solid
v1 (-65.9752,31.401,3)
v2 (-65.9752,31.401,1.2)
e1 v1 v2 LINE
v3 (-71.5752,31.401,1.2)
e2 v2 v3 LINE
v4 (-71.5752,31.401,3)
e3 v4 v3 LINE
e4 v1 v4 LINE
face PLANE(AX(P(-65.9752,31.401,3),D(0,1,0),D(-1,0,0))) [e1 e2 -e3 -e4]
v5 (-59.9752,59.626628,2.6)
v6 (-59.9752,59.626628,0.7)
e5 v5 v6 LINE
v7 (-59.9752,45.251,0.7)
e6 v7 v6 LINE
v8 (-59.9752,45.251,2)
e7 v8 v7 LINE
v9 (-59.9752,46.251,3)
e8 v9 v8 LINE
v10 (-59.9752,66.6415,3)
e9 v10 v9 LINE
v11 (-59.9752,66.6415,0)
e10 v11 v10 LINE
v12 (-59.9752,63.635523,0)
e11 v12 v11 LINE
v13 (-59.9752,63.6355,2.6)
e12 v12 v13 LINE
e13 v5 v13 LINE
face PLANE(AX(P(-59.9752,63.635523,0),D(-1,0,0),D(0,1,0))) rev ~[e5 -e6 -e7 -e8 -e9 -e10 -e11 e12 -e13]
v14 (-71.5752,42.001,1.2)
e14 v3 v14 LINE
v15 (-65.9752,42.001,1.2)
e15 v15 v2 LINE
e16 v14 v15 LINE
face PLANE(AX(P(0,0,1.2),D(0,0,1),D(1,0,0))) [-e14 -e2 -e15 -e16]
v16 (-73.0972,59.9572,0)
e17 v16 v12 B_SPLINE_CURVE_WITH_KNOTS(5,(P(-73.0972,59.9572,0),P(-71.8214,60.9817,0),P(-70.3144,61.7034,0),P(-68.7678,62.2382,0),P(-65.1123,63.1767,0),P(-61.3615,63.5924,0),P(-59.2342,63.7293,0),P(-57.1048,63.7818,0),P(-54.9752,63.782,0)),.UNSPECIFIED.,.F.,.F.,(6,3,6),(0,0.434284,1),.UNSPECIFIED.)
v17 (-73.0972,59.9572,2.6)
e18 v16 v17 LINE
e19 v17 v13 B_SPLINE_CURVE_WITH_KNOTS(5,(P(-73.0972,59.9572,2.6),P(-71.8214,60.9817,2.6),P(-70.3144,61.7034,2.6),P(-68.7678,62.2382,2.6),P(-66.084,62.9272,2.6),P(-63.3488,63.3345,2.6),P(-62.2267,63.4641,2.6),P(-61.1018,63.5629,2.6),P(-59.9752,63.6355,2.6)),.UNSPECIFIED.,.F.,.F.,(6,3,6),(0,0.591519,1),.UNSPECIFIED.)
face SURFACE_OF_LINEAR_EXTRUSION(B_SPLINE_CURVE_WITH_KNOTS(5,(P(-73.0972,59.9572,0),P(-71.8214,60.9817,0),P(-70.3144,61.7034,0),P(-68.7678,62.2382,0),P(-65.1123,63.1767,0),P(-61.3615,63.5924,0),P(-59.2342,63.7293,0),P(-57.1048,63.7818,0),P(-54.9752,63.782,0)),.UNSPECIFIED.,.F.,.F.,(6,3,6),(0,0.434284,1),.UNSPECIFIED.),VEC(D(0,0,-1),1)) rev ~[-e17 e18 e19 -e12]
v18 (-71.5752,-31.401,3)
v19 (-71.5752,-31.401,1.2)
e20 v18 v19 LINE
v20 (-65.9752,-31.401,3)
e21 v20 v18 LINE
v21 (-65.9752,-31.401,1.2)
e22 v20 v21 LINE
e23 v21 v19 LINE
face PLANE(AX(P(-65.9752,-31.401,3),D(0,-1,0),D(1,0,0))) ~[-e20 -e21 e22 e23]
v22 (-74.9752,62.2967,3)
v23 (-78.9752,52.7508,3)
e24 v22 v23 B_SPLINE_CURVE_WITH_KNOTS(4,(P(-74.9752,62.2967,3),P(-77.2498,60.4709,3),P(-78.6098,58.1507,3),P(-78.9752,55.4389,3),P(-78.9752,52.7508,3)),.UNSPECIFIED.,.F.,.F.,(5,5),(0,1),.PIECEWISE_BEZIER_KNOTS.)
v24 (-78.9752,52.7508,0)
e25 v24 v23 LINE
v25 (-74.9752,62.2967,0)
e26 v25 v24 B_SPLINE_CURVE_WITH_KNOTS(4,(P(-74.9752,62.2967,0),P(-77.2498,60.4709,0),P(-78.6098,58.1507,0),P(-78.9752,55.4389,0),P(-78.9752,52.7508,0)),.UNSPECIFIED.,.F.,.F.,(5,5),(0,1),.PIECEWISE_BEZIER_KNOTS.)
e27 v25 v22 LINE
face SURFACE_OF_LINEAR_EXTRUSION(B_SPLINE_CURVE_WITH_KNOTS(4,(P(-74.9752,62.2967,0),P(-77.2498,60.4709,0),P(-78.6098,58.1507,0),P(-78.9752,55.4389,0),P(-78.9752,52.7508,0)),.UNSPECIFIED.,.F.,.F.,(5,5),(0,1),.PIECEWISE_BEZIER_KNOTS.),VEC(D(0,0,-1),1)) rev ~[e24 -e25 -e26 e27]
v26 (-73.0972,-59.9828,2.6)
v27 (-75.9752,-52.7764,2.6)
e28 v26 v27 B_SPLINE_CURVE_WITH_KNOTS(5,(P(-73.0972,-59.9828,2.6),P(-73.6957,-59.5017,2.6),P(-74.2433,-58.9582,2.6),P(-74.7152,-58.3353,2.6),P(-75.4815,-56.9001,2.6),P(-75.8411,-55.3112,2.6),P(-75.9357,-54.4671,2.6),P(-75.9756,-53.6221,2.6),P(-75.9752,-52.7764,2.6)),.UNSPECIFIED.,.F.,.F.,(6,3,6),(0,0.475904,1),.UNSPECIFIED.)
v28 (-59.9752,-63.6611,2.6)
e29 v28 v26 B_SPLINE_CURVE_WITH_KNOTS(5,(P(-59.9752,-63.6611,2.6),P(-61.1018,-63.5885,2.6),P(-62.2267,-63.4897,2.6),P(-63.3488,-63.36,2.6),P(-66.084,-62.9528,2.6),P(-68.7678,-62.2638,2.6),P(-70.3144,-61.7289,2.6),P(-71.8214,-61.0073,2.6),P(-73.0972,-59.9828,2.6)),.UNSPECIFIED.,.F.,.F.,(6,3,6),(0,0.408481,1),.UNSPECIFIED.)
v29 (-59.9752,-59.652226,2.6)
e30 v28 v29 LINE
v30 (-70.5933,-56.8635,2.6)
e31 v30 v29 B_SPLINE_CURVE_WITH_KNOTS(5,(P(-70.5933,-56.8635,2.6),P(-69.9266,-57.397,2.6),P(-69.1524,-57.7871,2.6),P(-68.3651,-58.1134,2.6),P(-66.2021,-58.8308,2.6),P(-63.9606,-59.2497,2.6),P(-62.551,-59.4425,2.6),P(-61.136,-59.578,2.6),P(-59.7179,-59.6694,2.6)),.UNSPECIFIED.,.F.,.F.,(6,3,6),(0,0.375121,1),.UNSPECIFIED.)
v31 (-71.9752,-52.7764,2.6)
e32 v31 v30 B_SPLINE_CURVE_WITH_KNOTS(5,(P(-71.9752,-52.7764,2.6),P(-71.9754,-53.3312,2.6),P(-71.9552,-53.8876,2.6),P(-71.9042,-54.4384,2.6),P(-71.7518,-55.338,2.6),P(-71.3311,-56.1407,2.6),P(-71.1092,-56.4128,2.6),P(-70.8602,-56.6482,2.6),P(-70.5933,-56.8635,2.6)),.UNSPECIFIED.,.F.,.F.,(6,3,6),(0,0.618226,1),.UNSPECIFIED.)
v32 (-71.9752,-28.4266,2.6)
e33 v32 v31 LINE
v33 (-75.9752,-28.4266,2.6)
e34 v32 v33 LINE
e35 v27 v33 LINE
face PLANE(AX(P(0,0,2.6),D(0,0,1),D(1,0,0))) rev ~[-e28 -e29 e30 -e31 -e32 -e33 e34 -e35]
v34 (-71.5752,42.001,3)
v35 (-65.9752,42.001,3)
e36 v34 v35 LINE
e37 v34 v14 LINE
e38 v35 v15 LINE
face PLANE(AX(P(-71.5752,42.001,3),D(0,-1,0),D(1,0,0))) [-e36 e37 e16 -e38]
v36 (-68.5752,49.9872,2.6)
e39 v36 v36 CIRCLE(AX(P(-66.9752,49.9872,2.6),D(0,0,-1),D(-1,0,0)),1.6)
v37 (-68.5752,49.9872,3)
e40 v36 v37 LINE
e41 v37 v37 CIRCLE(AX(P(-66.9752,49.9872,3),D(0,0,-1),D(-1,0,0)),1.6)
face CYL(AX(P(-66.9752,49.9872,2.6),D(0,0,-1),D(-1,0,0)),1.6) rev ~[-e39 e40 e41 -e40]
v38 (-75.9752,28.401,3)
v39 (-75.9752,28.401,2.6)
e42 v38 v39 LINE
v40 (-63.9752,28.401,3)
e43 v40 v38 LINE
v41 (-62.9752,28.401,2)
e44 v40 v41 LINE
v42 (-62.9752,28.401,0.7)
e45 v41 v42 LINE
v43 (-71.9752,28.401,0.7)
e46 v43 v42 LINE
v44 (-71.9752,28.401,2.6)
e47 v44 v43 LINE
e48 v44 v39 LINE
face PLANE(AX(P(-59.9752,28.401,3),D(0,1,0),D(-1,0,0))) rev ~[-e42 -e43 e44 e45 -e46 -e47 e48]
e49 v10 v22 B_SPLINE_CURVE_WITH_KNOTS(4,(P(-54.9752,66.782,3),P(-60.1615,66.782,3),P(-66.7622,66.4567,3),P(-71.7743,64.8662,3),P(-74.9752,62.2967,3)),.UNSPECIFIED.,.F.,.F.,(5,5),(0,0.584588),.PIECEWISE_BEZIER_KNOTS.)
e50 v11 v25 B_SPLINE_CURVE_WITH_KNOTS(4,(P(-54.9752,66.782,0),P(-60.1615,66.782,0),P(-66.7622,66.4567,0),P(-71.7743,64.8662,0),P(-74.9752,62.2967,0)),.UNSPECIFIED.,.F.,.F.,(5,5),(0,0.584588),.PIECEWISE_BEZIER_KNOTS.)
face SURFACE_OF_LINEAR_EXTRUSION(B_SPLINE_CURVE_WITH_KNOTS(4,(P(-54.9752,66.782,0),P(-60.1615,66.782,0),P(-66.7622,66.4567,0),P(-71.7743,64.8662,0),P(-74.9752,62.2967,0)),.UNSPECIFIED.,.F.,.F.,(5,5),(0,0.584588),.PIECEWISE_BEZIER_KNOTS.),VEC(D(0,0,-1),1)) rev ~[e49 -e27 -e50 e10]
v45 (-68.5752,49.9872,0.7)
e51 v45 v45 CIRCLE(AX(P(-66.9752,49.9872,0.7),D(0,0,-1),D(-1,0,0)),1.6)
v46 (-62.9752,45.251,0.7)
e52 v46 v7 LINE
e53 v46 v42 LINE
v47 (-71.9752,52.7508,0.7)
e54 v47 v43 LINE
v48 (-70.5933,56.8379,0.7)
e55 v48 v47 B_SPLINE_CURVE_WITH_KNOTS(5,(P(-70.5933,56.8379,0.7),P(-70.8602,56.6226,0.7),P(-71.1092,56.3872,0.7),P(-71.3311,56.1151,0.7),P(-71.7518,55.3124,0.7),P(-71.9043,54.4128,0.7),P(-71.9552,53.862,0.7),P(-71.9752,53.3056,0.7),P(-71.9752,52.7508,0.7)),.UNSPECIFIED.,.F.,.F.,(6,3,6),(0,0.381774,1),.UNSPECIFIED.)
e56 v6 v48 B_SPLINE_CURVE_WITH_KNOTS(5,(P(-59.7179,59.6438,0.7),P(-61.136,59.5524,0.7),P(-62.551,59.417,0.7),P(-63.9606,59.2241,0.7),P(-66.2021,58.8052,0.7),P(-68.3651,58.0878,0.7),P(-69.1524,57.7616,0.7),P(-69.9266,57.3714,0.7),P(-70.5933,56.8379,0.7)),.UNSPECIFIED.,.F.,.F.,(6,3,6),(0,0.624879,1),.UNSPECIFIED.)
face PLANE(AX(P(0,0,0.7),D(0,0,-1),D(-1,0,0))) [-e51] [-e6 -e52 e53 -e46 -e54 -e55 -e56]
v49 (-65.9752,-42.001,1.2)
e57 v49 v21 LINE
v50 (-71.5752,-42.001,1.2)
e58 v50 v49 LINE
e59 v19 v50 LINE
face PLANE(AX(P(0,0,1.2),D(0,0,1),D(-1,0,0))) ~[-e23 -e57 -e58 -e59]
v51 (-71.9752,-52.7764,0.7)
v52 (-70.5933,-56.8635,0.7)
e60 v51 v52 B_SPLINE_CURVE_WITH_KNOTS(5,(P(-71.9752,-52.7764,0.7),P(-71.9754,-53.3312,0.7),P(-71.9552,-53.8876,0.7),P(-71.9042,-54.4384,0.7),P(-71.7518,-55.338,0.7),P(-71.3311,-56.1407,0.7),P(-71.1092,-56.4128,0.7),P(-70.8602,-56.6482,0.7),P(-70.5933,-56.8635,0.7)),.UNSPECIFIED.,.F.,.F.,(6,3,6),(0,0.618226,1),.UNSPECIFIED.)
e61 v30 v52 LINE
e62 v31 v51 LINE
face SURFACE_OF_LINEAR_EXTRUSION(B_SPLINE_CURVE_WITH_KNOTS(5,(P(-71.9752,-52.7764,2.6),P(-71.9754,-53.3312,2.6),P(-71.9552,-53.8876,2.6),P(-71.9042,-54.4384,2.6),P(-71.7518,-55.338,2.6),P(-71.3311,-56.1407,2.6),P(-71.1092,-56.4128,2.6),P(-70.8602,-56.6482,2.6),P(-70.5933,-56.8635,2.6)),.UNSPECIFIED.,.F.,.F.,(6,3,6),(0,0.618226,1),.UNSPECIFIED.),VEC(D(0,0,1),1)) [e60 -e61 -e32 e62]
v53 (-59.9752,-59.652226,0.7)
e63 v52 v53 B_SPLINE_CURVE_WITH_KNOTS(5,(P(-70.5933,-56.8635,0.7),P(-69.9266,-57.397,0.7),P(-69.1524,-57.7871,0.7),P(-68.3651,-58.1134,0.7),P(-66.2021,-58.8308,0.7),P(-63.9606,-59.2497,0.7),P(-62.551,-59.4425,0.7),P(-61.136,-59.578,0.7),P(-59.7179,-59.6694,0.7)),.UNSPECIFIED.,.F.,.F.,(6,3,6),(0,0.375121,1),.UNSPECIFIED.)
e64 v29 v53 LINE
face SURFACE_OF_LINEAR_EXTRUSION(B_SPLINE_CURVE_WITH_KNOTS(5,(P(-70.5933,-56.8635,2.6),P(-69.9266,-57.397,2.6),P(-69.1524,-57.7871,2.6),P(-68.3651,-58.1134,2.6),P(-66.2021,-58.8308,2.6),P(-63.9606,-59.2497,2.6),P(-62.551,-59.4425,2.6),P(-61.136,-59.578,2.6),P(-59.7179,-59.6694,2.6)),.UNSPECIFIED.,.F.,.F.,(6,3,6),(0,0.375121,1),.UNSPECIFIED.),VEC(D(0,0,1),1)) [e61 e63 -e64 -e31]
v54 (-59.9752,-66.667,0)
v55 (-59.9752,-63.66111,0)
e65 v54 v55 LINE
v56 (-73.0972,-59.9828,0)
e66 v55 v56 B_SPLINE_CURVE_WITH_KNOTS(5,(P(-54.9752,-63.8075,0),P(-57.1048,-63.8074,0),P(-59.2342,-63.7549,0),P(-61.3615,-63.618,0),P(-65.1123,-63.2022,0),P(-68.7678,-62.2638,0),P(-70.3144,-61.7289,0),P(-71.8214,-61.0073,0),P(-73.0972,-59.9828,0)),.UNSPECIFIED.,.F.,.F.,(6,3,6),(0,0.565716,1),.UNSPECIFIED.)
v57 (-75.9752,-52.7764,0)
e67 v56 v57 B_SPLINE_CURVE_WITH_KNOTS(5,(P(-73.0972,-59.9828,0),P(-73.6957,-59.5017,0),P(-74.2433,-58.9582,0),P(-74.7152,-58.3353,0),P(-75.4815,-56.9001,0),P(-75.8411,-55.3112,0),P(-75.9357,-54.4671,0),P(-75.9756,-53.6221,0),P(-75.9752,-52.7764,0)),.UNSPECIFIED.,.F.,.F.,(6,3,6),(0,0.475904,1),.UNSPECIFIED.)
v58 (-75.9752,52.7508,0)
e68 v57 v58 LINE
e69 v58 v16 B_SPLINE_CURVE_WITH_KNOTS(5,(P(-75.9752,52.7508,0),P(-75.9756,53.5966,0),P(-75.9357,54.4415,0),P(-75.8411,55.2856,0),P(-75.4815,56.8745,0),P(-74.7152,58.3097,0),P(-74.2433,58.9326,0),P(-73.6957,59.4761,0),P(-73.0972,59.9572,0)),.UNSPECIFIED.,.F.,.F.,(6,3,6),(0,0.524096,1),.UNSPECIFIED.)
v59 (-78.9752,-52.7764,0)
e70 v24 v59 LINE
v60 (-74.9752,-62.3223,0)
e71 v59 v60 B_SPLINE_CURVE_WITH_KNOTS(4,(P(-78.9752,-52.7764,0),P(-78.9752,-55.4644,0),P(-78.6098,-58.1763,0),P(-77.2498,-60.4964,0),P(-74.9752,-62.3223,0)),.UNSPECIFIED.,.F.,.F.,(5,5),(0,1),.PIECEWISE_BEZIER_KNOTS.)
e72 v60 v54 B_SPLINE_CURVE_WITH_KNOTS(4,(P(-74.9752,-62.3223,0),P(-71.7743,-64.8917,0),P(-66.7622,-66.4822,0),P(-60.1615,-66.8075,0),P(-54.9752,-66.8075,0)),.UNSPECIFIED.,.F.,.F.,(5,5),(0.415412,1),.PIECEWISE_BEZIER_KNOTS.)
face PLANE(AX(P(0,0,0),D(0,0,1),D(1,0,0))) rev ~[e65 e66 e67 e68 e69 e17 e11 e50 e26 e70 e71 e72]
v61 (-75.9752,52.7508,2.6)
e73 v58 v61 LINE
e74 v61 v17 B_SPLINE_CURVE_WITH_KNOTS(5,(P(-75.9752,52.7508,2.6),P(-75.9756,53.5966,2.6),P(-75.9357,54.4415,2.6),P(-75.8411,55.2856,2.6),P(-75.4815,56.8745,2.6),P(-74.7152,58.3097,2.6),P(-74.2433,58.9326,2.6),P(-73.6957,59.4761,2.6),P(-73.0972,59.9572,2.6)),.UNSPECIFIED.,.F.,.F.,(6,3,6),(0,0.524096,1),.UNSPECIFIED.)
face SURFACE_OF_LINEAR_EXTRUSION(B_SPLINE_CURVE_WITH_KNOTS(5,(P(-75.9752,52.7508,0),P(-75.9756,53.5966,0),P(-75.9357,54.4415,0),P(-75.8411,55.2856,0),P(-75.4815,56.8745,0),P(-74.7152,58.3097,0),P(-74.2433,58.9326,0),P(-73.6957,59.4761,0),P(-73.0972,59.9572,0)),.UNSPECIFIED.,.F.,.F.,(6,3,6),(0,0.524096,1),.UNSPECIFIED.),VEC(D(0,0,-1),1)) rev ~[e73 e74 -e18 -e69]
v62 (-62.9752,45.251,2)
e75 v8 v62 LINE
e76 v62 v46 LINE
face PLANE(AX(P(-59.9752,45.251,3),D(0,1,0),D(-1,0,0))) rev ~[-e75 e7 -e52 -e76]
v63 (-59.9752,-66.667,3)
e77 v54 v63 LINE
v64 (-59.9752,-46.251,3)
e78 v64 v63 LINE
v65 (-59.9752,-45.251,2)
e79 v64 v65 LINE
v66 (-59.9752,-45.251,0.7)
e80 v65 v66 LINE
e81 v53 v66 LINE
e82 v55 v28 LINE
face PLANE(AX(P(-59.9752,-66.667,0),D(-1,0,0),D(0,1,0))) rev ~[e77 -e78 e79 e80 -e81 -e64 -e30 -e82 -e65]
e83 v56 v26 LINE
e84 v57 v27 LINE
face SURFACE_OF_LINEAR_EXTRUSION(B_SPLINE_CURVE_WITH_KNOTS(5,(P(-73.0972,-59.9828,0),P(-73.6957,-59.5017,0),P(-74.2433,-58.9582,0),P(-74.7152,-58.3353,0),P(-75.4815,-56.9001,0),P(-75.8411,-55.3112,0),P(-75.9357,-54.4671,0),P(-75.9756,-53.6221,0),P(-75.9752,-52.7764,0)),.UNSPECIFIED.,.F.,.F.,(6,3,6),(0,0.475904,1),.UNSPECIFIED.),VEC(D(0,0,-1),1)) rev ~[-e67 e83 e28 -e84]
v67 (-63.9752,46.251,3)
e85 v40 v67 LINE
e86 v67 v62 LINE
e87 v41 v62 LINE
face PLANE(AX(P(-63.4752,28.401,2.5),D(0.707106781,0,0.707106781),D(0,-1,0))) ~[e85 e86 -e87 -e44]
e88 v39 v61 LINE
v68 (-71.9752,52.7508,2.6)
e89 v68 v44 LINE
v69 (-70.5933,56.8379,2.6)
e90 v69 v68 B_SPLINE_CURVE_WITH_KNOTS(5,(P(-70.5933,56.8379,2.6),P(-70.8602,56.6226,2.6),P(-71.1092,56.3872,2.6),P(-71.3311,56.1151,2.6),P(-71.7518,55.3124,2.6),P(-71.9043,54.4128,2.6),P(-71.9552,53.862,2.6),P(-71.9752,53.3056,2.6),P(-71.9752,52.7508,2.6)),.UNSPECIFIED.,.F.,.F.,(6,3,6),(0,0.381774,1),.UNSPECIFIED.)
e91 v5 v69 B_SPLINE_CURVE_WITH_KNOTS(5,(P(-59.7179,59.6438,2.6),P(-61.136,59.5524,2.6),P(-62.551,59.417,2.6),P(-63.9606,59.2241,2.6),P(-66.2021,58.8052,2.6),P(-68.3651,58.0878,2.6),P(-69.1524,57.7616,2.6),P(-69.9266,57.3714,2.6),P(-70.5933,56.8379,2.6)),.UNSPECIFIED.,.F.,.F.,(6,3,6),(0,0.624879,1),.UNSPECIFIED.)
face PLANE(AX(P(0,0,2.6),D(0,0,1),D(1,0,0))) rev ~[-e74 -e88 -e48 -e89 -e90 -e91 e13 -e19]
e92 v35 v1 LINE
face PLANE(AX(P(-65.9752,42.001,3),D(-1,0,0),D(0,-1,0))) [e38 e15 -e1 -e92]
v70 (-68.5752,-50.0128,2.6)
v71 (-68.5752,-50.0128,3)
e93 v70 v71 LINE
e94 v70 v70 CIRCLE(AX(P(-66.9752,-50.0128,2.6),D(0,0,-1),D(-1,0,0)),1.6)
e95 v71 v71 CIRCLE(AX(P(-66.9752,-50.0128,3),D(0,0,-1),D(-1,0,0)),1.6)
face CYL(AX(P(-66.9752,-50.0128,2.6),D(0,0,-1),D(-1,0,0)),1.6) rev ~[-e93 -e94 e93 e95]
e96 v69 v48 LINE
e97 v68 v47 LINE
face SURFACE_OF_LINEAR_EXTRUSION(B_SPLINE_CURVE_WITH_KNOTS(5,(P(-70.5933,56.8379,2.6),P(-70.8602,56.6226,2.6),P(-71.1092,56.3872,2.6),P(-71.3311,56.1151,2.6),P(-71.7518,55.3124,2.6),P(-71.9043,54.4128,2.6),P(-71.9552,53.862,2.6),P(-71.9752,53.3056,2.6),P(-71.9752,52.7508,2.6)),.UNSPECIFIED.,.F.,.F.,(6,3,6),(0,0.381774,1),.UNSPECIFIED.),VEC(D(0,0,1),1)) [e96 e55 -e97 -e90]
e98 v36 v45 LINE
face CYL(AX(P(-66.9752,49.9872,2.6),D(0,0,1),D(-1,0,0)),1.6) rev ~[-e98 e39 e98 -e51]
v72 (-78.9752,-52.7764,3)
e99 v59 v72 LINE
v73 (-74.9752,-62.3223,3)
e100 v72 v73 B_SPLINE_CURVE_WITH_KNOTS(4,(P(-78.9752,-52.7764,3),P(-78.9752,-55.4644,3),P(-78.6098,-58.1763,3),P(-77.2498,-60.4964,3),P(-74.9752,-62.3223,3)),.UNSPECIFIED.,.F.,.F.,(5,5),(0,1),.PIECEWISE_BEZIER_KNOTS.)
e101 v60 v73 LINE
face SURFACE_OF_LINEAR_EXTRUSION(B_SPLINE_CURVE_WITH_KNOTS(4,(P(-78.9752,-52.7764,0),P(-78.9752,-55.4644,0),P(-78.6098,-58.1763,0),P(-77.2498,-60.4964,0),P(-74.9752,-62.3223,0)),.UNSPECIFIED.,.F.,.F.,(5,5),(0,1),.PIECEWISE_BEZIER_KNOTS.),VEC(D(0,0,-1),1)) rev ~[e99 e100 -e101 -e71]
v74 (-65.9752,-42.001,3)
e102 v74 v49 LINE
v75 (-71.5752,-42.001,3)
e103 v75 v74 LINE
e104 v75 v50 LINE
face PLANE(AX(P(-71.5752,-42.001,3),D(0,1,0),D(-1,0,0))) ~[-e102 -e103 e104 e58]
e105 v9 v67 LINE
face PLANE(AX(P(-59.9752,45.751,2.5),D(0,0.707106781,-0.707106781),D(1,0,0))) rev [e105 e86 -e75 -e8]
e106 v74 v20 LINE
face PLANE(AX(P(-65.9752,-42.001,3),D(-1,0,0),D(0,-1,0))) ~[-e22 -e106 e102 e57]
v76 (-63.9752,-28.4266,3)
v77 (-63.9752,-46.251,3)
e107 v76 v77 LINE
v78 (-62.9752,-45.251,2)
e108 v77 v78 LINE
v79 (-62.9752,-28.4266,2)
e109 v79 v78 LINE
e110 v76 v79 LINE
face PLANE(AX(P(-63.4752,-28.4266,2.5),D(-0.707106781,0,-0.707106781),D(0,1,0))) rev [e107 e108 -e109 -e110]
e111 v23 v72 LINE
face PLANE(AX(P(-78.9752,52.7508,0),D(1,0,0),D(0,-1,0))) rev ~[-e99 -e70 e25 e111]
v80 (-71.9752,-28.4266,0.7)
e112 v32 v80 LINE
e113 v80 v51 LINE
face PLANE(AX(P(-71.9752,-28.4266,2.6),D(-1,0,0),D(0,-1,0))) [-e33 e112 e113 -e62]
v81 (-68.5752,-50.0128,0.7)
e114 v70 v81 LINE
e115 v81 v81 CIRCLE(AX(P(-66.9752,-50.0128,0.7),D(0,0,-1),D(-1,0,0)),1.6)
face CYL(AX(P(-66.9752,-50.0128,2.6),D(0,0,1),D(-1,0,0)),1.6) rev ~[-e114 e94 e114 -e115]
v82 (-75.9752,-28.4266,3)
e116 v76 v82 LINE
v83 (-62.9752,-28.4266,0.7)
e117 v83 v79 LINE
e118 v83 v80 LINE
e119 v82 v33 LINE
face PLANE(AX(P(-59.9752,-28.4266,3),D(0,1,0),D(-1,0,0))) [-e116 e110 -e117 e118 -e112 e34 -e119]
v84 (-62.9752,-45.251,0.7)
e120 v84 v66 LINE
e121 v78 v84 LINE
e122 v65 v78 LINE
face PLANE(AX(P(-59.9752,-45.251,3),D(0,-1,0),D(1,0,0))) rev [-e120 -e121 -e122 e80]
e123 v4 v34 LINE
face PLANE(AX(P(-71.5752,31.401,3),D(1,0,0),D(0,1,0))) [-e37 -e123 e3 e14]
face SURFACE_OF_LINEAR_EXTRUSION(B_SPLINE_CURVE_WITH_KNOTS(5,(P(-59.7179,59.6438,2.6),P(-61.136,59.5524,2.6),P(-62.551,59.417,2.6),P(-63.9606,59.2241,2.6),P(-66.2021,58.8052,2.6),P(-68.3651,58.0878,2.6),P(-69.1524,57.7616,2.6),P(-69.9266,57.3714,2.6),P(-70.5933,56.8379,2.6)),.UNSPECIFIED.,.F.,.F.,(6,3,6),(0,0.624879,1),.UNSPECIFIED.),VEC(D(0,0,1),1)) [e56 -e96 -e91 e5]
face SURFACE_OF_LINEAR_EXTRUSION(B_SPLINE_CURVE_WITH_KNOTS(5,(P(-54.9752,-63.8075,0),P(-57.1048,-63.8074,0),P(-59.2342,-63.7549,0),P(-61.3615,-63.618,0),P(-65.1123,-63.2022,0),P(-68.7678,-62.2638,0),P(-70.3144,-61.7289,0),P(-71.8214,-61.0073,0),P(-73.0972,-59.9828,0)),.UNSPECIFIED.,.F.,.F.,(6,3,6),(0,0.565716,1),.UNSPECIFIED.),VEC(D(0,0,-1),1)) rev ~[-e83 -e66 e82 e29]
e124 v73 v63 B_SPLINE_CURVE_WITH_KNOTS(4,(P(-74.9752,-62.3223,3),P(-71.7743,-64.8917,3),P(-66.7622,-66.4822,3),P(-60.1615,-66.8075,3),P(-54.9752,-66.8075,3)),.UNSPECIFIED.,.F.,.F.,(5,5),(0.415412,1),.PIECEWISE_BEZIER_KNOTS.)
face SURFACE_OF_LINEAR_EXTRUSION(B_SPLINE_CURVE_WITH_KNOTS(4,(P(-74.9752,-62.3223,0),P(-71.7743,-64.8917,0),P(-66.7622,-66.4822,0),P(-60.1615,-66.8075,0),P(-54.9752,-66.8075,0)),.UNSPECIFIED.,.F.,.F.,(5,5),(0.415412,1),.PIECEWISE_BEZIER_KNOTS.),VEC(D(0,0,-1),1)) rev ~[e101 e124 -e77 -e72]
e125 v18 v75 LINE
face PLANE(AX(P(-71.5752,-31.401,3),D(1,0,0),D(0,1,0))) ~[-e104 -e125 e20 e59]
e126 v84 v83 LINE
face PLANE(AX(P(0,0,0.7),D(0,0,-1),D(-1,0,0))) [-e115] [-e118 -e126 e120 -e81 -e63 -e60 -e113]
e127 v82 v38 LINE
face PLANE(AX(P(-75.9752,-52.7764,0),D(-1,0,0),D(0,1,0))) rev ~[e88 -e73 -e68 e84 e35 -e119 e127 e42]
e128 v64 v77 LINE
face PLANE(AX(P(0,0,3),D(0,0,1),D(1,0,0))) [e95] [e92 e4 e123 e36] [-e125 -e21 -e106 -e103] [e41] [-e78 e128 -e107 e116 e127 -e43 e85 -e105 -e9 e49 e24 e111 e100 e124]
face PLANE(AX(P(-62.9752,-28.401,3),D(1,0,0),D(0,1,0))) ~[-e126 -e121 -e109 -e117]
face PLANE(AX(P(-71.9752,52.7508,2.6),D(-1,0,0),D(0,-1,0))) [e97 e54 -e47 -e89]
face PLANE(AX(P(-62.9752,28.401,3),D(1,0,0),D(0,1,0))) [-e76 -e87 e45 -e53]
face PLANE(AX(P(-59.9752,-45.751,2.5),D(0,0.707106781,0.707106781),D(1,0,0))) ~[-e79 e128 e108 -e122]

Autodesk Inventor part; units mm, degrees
ref_plane "YZ Plane" through (0, 0, 0) normal (1, 0, 0) x (0, 1, 0)
ref_plane "XZ Plane" through (0, 0, 0) normal (0, 1, 0) x (-1, 0, 0)
ref_plane "XY Plane" through (0, 0, 0) normal (0, 0, 1) x (1, 0, 0)
sketch "Эскиз1" plane through (0, 0, 0) normal (0, 0, 1) x (1, 0, 0)
  arc A0 (21.9698, 25.0872) -> (24.9698, 22.0872) centre (24.9698, 25.0872) ccw
  line L0 (24.9698, 22.0872) -> (32.4715, 22.0872)
  arc A1 (35.4715, 19.0872) -> (32.4715, 22.0872) centre (32.4715, 19.0872) ccw
  line L1 (35.4715, 19.0872) -> (35.4715, -12.1128)
  arc A2 (32.4715, -15.1128) -> (35.4715, -12.1128) centre (32.4715, -12.1128) ccw
  line L2 (32.4715, -15.1128) -> (24.9698, -15.1128)
  arc A3 (24.9698, -15.1128) -> (21.9698, -18.1128) centre (24.9698, -18.1128) ccw
  line L3 (21.9698, -18.1128) -> (21.9698, -28.1128)
  line L4 (21.9698, -28.1128) -> (36.9698, -28.1128)
  line L5 (36.9698, -28.1128) -> (36.9698, -40.6128)
  line L6 (36.9698, -40.6128) -> (21.9698, -40.6128)
  line L7 (21.9698, -40.6128) -> (21.9698, -43.5128)
  line L8 (21.9698, -43.5128) -> (58.0248, -43.5128)
  arc A4 (60.0248, -45.5128) -> (58.0248, -43.5128) centre (58.0248, -45.5128) ccw
  line L9 (60.0248, -45.5128) -> (60.0248, -60.8075)
  arc A5 (58.0248, -62.8075) -> (60.0248, -60.8075) centre (58.0248, -60.8075) ccw
  line L10 (58.0248, -62.8075) -> (-57.9752, -62.8075)
  arc A6 (-59.9752, -60.8075) -> (-57.9752, -62.8075) centre (-57.9752, -60.8075) ccw
  line L11 (-59.9752, -60.8075) -> (-59.9752, -45.5128)
  arc A7 (-57.9752, -43.5128) -> (-59.9752, -45.5128) centre (-57.9752, -45.5128) ccw
  line L12 (-57.9752, -43.5128) -> (-22.0457, -43.5128)
  line L13 (-22.0457, -43.5128) -> (-22.0457, -40.6128)
  line L14 (-22.0457, -40.6128) -> (-39.5957, -40.6128)
  line L15 (-39.5957, -40.6128) -> (-39.5957, -29.6128)
  line L16 (-39.5957, -29.6128) -> (-22.0457, -29.6128)
  line L17 (-22.0457, -29.6128) -> (-22.0457, -27.6266)
  line L18 (-22.0457, -27.6266) -> (-23.1715, -27.6266)
  line L19 (-23.1715, -27.6266) -> (-23.1715, -10.2508)
  line L20 (-23.1715, -10.2508) -> (-22.0457, -10.2508)
  line L21 (-22.0457, -10.2508) -> (-22.0457, -5.0128)
  line L22 (-22.0457, -5.0128) -> (-25.0457, -5.0128)
  line L23 (-25.0457, -5.0128) -> (-25.0457, 4.9872)
  line L24 (-25.0457, 4.9872) -> (-22.0457, 4.9872)
  line L25 (-22.0457, 4.9872) -> (-22.0457, 10.2252)
  line L26 (-22.0457, 10.2252) -> (-23.1715, 10.2252)
  line L27 (-23.1715, 10.2252) -> (-23.1715, 27.601)
  line L28 (-23.1715, 27.601) -> (-22.0457, 27.601)
  line L29 (-22.0457, 27.601) -> (-22.0457, 43.4872)
  line L30 (-22.0457, 43.4872) -> (-57.9752, 43.4872)
  arc A8 (-59.9752, 45.4872) -> (-57.9752, 43.4872) centre (-57.9752, 45.4872) ccw
  line L31 (-59.9752, 45.4872) -> (-59.9752, 60.782)
  arc A9 (-57.9752, 62.782) -> (-59.9752, 60.782) centre (-57.9752, 60.782) ccw
  line L32 (-57.9752, 62.782) -> (58.0248, 62.782)
  arc A10 (60.0248, 60.782) -> (58.0248, 62.782) centre (58.0248, 60.782) ccw
  line L33 (60.0248, 60.782) -> (60.0248, 45.4872)
  arc A11 (58.0248, 43.4872) -> (60.0248, 45.4872) centre (58.0248, 45.4872) ccw
  line L34 (58.0248, 43.4872) -> (21.9698, 43.4872)
  line L35 (21.9698, 43.4872) -> (21.9698, 25.0872)
  circle A12 centre (-51.6466, 22.9919) radius 1.5
  circle A13 centre (-51.6466, -23.0174) radius 1.5
  line L36 (-50.445, -3.8128) -> (-50.445, 15.6872)
  arc A14 (-47.445, 18.6872) -> (-50.445, 15.6872) centre (-47.445, 15.6872) ccw
  line L37 (-47.445, 18.6872) -> (-33.6813, 18.6872)
  arc A15 (-30.6813, 15.6872) -> (-33.6813, 18.6872) centre (-33.6813, 15.6872) ccw
  line L38 (-30.6813, 15.6872) -> (-30.6813, -3.8128)
  arc A16 (-33.6813, -6.8128) -> (-30.6813, -3.8128) centre (-33.6813, -3.8128) ccw
  line L39 (-33.6813, -6.8128) -> (-47.445, -6.8128)
  arc A17 (-50.445, -3.8128) -> (-47.445, -6.8128) centre (-47.445, -3.8128) ccw
  line L40 (60.4248, -29.3128) -> (60.4248, -21.9128)
  line L41 (60.4248, -21.9128) -> (74.9248, -21.9128)
  line L42 (74.9248, -21.9128) -> (74.9248, -29.3128)
  line L43 (74.9248, -29.3128) -> (60.4248, -29.3128)
  line L44 (60.4248, 21.8872) -> (60.4248, 29.2872)
  line L45 (60.4248, 29.2872) -> (74.9248, 29.2872)
  line L46 (74.9248, 29.2872) -> (74.9248, 21.8872)
  line L47 (74.9248, 21.8872) -> (60.4248, 21.8872)
  line L48 (79.0248, -17.5128) -> (68.0248, -17.5128)
  line L49 (68.0248, -17.5128) -> (68.0248, -6.0128)
  line L50 (68.0248, -6.0128) -> (63.1715, -6.0128)
  arc A18 (62.1715, -5.0128) -> (63.1715, -6.0128) centre (63.1715, -5.0128) ccw
  line L51 (62.1715, -5.0128) -> (62.1715, 4.9872)
  arc A19 (63.1715, 5.9872) -> (62.1715, 4.9872) centre (63.1715, 4.9872) ccw
  line L52 (63.1715, 5.9872) -> (68.0248, 5.9872)
  line L53 (68.0248, 5.9872) -> (68.0248, 17.4872)
  line L54 (68.0248, 17.4872) -> (79.0248, 17.4872)
  line L55 (79.0248, 17.4872) -> (79.0248, 52.7508)
  spline S0 degree 4 poles (79.0248, 52.7508) (79.0248, 55.4389) (78.6593, 58.1507) (77.2994, 60.4709) (75.0248, 62.2967) knots 0 0 0 0 0 1 1 1 1 1
  spline S1 degree 4 poles (75.0248, 62.2967) (71.8239, 64.8662) (66.8118, 66.4567) (60.2111, 66.782) (55.0248, 66.782) knots 0.415412 0.415412 0.415412 0.415412 0.415412 1 1 1 1 1
  line L56 (-54.9752, 66.782) -> (55.0248, 66.782)
  spline S2 degree 4 poles (-54.9752, 66.782) (-60.1615, 66.782) (-66.7622, 66.4567) (-71.7743, 64.8662) (-74.9752, 62.2967) knots 0 0 0 0 0 0.584588 0.584588 0.584588 0.584588 0.584588
  spline S3 degree 4 poles (-74.9752, 62.2967) (-77.2498, 60.4709) (-78.6098, 58.1507) (-78.9752, 55.4389) (-78.9752, 52.7508) knots 0 0 0 0 0 1 1 1 1 1
  line L57 (-78.9752, 52.7508) -> (-78.9752, -52.7764)
  spline S4 degree 4 poles (-78.9752, -52.7764) (-78.9752, -55.4644) (-78.6098, -58.1763) (-77.2498, -60.4964) (-74.9752, -62.3223) knots 0 0 0 0 0 1 1 1 1 1
  spline S5 degree 4 poles (-74.9752, -62.3223) (-71.7743, -64.8917) (-66.7622, -66.4822) (-60.1615, -66.8075) (-54.9752, -66.8075) knots 0.415412 0.415412 0.415412 0.415412 0.415412 1 1 1 1 1
  line L58 (55.0248, -66.8075) -> (-54.9752, -66.8075)
  spline S6 degree 4 poles (55.0248, -66.8075) (60.2111, -66.8075) (66.8118, -66.4822) (71.8239, -64.8917) (75.0248, -62.3223) knots 0 0 0 0 0 0.584588 0.584588 0.584588 0.584588 0.584588
  spline S7 degree 4 poles (75.0248, -62.3223) (77.2994, -60.4964) (78.6593, -58.1763) (79.0248, -55.4644) (79.0248, -52.7764) knots 0 0 0 0 0 1 1 1 1 1
  line L59 (79.0248, -52.7764) -> (79.0248, -17.5128)
  circle A20 centre (-29.4752, -25.5128) radius 1.25
  circle A21 centre (29.5248, 25.4872) radius 1.25
  circle A22 centre (29.5248, -25.5128) radius 1.25
  circle A23 centre (-29.4752, 25.4872) radius 1.25
  circle A24 centre (-51.6466, 22.9919) radius 2.1
  circle A25 centre (-51.6466, -23.0174) radius 2.1
  line L60 (-72.9752, -28.1266) -> (-39.8957, -28.1266)
  line L61 (-39.8957, 28.101) -> (-72.9752, 28.101)
  line L62 (-39.8957, 28.101) -> (-39.8957, 16.9648)
  ellipse E0 centre (-48.5541, 13.1872) end of major axis (-34.5198, 13.1872) minor radius 4.8 (-39.8957, 16.9648) -> (-62.5883, 13.1872) ccw
  line L63 (-62.5883, 13.1872) -> (-62.5883, -1.3128)
  ellipse E1 centre (-48.5541, -1.3128) end of major axis (-62.5883, -1.3128) minor radius 4.8 (-62.5883, -1.3128) -> (-39.8957, -5.0904) ccw
  line L64 (-39.8957, -5.0904) -> (-39.8957, -28.1266)
  line L65 (-59.9752, -66.667) -> (-59.9752, 66.6415)
  line L66 (-75.9752, -52.7764) -> (-75.9752, 52.7508)
  line L67 (-54.9752, 63.782) -> (55.0248, 63.782)
  line L68 (76.0248, 52.7508) -> (76.0248, 20.4872)
  line L69 (76.0248, 20.4872) -> (65.0248, 20.4872)
  line L70 (65.0248, 20.4872) -> (65.0248, 8.9872)
  line L71 (65.0248, 8.9872) -> (63.1715, 8.9872)
  arc A26 (63.1715, 8.9872) -> (59.1715, 4.9872) centre (63.1715, 4.9872) ccw
  line L72 (59.1715, 4.9872) -> (59.1715, -5.0128)
  arc A27 (59.1715, -5.0128) -> (63.1715, -9.0128) centre (63.1715, -5.0128) ccw
  line L73 (63.1715, -9.0128) -> (65.0248, -9.0128)
  line L74 (65.0248, -9.0128) -> (65.0248, -20.5128)
  line L75 (65.0248, -20.5128) -> (76.0248, -20.5128)
  line L76 (76.0248, -20.5128) -> (76.0248, -52.7764)
  line L77 (55.0248, -63.8075) -> (-54.9752, -63.8075)
  line L78 (-72.9752, -28.1266) -> (-72.9752, 28.101)
  spline S8 degree 5 poles (-73.0972, -59.9828) (-73.6957, -59.5017) (-74.2433, -58.9582) (-74.7152, -58.3353) (-75.4815, -56.9001) (-75.8411, -55.3112) (-75.9357, -54.4671) (-75.9756, -53.6221) (-75.9752, -52.7764) knots 0 0 0 0 0 0 0.475904 0.475904 0.475904 1 1 1 1 1 1
  spline S9 degree 5 poles (-75.9752, 52.7508) (-75.9756, 53.5966) (-75.9357, 54.4415) (-75.8411, 55.2856) (-75.4815, 56.8745) (-74.7152, 58.3097) (-74.2433, 58.9326) (-73.6957, 59.4761) (-73.0972, 59.9572) knots 0 0 0 0 0 0 0.524096 0.524096 0.524096 1 1 1 1 1 1
  spline S10 degree 5 poles (-73.0972, 59.9572) (-71.8214, 60.9817) (-70.3144, 61.7034) (-68.7678, 62.2382) (-65.1123, 63.1767) (-61.3615, 63.5924) (-59.2342, 63.7293) (-57.1048, 63.7818) (-54.9752, 63.782) knots 0 0 0 0 0 0 0.434284 0.434284 0.434284 1 1 1 1 1 1
  spline S11 degree 5 poles (55.0248, 63.782) (57.1544, 63.7818) (59.2838, 63.7293) (61.4111, 63.5924) (65.1619, 63.1767) (68.8174, 62.2382) (70.364, 61.7034) (71.871, 60.9817) (73.1468, 59.9572) knots 0 0 0 0 0 0 0.565716 0.565716 0.565716 1 1 1 1 1 1
  spline S12 degree 5 poles (73.1468, 59.9572) (73.7453, 59.4761) (74.2929, 58.9326) (74.7647, 58.3097) (75.531, 56.8745) (75.8907, 55.2856) (75.9853, 54.4415) (76.0252, 53.5966) (76.0248, 52.7508) knots 0 0 0 0 0 0 0.475904 0.475904 0.475904 1 1 1 1 1 1
  spline S13 degree 5 poles (76.0248, -52.7764) (76.0252, -53.6221) (75.9853, -54.4671) (75.8907, -55.3112) (75.531, -56.9001) (74.7647, -58.3353) (74.2929, -58.9582) (73.7453, -59.5017) (73.1468, -59.9828) knots 0 0 0 0 0 0 0.524096 0.524096 0.524096 1 1 1 1 1 1
  spline S14 degree 5 poles (73.1468, -59.9828) (71.871, -61.0073) (70.364, -61.7289) (68.8174, -62.2638) (65.1619, -63.2022) (61.4111, -63.618) (59.2838, -63.7549) (57.1544, -63.8074) (55.0248, -63.8075) knots 0 0 0 0 0 0 0.434284 0.434284 0.434284 1 1 1 1 1 1
  spline S15 degree 5 poles (-54.9752, -63.8075) (-57.1048, -63.8074) (-59.2342, -63.7549) (-61.3615, -63.618) (-65.1123, -63.2022) (-68.7678, -62.2638) (-70.3144, -61.7289) (-71.8214, -61.0073) (-73.0972, -59.9828) knots 0 0 0 0 0 0 0.565716 0.565716 0.565716 1 1 1 1 1 1
  point P0 (0, 0)
  point P1 (-78.9752, -28.1266)
  point P2 (-78.9752, 28.101)
  point P3 (-59.9752, -63.6611)
  point P4 (-59.9752, 63.6356)
  dimension "d0" = 3
extrude "Выдавливание1" add sketch "Эскиз1" along normal blind 3 contours S10 S9 L66 S8 S15 L65 S5 S4 L57 S3 S2
sketch "Эскиз3" plane through (0, 0, 3) normal (0, 0, 1) x (1, 0, 0)
  line L0 (-78.9752, 52.7508) -> (-78.9752, -52.7764) projected
  line L1 (-59.9752, -66.667) -> (-59.9752, -63.6611) projected
  spline S0 degree 5 poles (-59.9752, -63.6611) (-61.1018, -63.5885) (-62.2267, -63.4897) (-63.3488, -63.36) (-66.084, -62.9528) (-68.7678, -62.2638) (-70.3144, -61.7289) (-71.8214, -61.0073) (-73.0972, -59.9828) knots 0 0 0 0 0 0 0.408481 0.408481 0.408481 1 1 1 1 1 1 projected
  spline S1 degree 5 poles (-73.0972, -59.9828) (-73.6957, -59.5017) (-74.2433, -58.9582) (-74.7152, -58.3353) (-75.4815, -56.9001) (-75.8411, -55.3112) (-75.9357, -54.4671) (-75.9756, -53.6221) (-75.9752, -52.7764) knots 0 0 0 0 0 0 0.475904 0.475904 0.475904 1 1 1 1 1 1 projected
  line L2 (-75.9752, -52.7764) -> (-75.9752, 52.7508) projected
  spline S2 degree 5 poles (-75.9752, 52.7508) (-75.9756, 53.5966) (-75.9357, 54.4415) (-75.8411, 55.2856) (-75.4815, 56.8745) (-74.7152, 58.3097) (-74.2433, 58.9326) (-73.6957, 59.4761) (-73.0972, 59.9572) knots 0 0 0 0 0 0 0.524096 0.524096 0.524096 1 1 1 1 1 1 projected
  spline S3 degree 5 poles (-73.0972, 59.9572) (-71.8214, 60.9817) (-70.3144, 61.7034) (-68.7678, 62.2382) (-66.084, 62.9272) (-63.3488, 63.3345) (-62.2267, 63.4641) (-61.1018, 63.5629) (-59.9752, 63.6355) knots 0 0 0 0 0 0 0.591519 0.591519 0.591519 1 1 1 1 1 1 projected
  line L3 (-59.9752, 63.6356) -> (-59.9752, 66.6415) projected
  line L4 (-39.8957, 28.101) -> (-59.6752, 28.101) projected
  line L5 (-39.8957, 28.101) -> (-39.8957, 16.9648) projected
  circle A0 centre (-51.6466, 22.9919) radius 2.1 projected
  line L6 (-78.9752, -28.1266) -> (-76.3894, -28.1266) projected
  line L7 (-78.9752, 28.101) -> (-78.9752, -28.1266) projected
  line L8 (-76.3894, 28.101) -> (-78.9752, 28.101) projected
  line L9 (-59.9752, -66.667) -> (-59.9752, -63.6611) projected
  line L10 (-59.9752, -63.6611) -> (-59.9752, 63.6356)
  line L11 (-59.9752, -28.4266) -> (-78.9752, -28.4266)
  line L12 (-59.9752, 28.401) -> (-78.9752, 28.401)
  line L13 (-76.3894, -28.1266) -> (-76.3894, 28.101) projected
  ellipse E0 centre (-48.5541, 13.1872) end of major axis (-34.5198, 13.1872) minor radius 4.8 (-39.8957, 16.9648) -> (-59.6752, 16.115) ccw projected
  line L14 (-59.6752, 16.115) -> (-59.6752, 28.101) projected
  point P0 (0, 0)
  point P1 (-75.9752, 28.401)
  point P2 (-75.9752, -28.4266)
  dimension "d5" = 0.3
extrude "Выдавливание3" add sketch "Эскиз3" against normal blind 0.4 contours L2 S2 S3 L10 L12 | L11 L10 S0 S1 L2
sketch "Эскиз4" plane through (0, 0, 2.6) normal (0, 0, -1) x (-1, 0, 0)
  circle A0 centre (66.9752, -50.0128) radius 1.35
  circle A1 centre (66.9752, 49.9872) radius 1.35
  arc A2 (57.945, -33.5297) -> (52.945, -33.5297) centre (55.445, -33.5297) ccw
  line L0 (57.945, -33.5297) -> (57.945, -38.6097)
  arc A3 (52.945, -38.6097) -> (57.945, -38.6097) centre (55.445, -38.6097) ccw
  line L1 (52.945, -38.6097) -> (52.945, -33.5297)
  line L2 (44.445, -39.1128) -> (44.445, -31.1128)
  arc A4 (45.445, -30.1128) -> (44.445, -31.1128) centre (45.445, -31.1128) ccw
  line L3 (45.445, -30.1128) -> (48.445, -30.1128)
  arc A5 (49.445, -31.1128) -> (48.445, -30.1128) centre (48.445, -31.1128) ccw
  line L4 (49.445, -31.1128) -> (49.445, -39.1128)
  arc A6 (48.445, -40.1128) -> (49.445, -39.1128) centre (48.445, -39.1128) ccw
  line L5 (48.445, -40.1128) -> (45.445, -40.1128)
  arc A7 (44.445, -39.1128) -> (45.445, -40.1128) centre (45.445, -39.1128) ccw
  arc A8 (40.445, -8.8128) -> (38.445, -6.8128) centre (38.445, -8.8128) ccw
  line L6 (38.445, -6.8128) -> (33.6813, -6.8128)
  arc A9 (30.6813, -3.8128) -> (33.6813, -6.8128) centre (33.6813, -3.8128) ccw
  line L7 (30.6813, -3.8128) -> (30.6813, 15.6872)
  arc A10 (33.6813, 18.6872) -> (30.6813, 15.6872) centre (33.6813, 15.6872) ccw
  line L8 (33.6813, 18.6872) -> (47.445, 18.6872)
  arc A11 (50.445, 15.6872) -> (47.445, 18.6872) centre (47.445, 15.6872) ccw
  line L9 (50.445, 15.6872) -> (50.445, -14.8128)
  arc A12 (48.445, -16.8128) -> (50.445, -14.8128) centre (48.445, -14.8128) ccw
  line L10 (48.445, -16.8128) -> (42.445, -16.8128)
  arc A13 (40.445, -14.8128) -> (42.445, -16.8128) centre (42.445, -14.8128) ccw
  line L11 (40.445, -14.8128) -> (40.445, -8.8128)
  circle A14 centre (51.6466, 22.9919) radius 1.5
  circle A15 centre (51.6466, -23.0174) radius 1.5
  line L12 (-60.4248, -21.9128) -> (-60.4248, -29.3128)
  line L13 (-60.4248, -29.3128) -> (-74.9248, -29.3128)
  line L14 (-74.9248, -29.3128) -> (-74.9248, -21.9128)
  line L15 (-74.9248, -21.9128) -> (-60.4248, -21.9128)
  line L16 (-60.4248, 29.2872) -> (-60.4248, 21.8872)
  line L17 (-60.4248, 21.8872) -> (-74.9248, 21.8872)
  line L18 (-74.9248, 21.8872) -> (-74.9248, 29.2872)
  line L19 (-74.9248, 29.2872) -> (-60.4248, 29.2872)
  line L20 (-68.0248, -17.5128) -> (-79.0248, -17.5128)
  line L21 (-79.0248, -52.7764) -> (-79.0248, -17.5128)
  spline S0 degree 4 poles (-75.0248, -62.3223) (-77.2994, -60.4964) (-78.6593, -58.1763) (-79.0248, -55.4644) (-79.0248, -52.7764) knots 0 0 0 0 0 1 1 1 1 1
  spline S1 degree 4 poles (-55.0248, -66.8075) (-60.2111, -66.8075) (-66.8118, -66.4822) (-71.8239, -64.8917) (-75.0248, -62.3223) knots 0 0 0 0 0 0.584588 0.584588 0.584588 0.584588 0.584588
  line L22 (54.9752, -66.8075) -> (-55.0248, -66.8075)
  spline S2 degree 4 poles (74.9752, -62.3223) (71.7743, -64.8917) (66.7622, -66.4822) (60.1615, -66.8075) (54.9752, -66.8075) knots 0.415412 0.415412 0.415412 0.415412 0.415412 1 1 1 1 1
  spline S3 degree 4 poles (78.9752, -52.7764) (78.9752, -55.4644) (78.6098, -58.1763) (77.2498, -60.4964) (74.9752, -62.3223) knots 0 0 0 0 0 1 1 1 1 1
  line L23 (78.9752, 52.7508) -> (78.9752, -52.7764)
  spline S4 degree 4 poles (74.9752, 62.2967) (77.2498, 60.4709) (78.6098, 58.1507) (78.9752, 55.4389) (78.9752, 52.7508) knots 0 0 0 0 0 1 1 1 1 1
  spline S5 degree 4 poles (54.9752, 66.782) (60.1615, 66.782) (66.7622, 66.4567) (71.7743, 64.8662) (74.9752, 62.2967) knots 0 0 0 0 0 0.584588 0.584588 0.584588 0.584588 0.584588
  line L24 (-55.0248, 66.782) -> (54.9752, 66.782)
  spline S6 degree 4 poles (-75.0248, 62.2967) (-71.8239, 64.8662) (-66.8118, 66.4567) (-60.2111, 66.782) (-55.0248, 66.782) knots 0.415412 0.415412 0.415412 0.415412 0.415412 1 1 1 1 1
  spline S7 degree 4 poles (-79.0248, 52.7508) (-79.0248, 55.4389) (-78.6593, 58.1507) (-77.2994, 60.4709) (-75.0248, 62.2967) knots 0 0 0 0 0 1 1 1 1 1
  line L25 (-79.0248, 17.4872) -> (-79.0248, 52.7508)
  line L26 (-79.0248, 17.4872) -> (-68.0248, 17.4872)
  line L27 (-68.0248, 17.4872) -> (-68.0248, 5.9872)
  line L28 (-68.0248, 5.9872) -> (-63.1715, 5.9872)
  arc A16 (-62.1715, 4.9872) -> (-63.1715, 5.9872) centre (-63.1715, 4.9872) ccw
  line L29 (-62.1715, 4.9872) -> (-62.1715, -5.0128)
  arc A17 (-63.1715, -6.0128) -> (-62.1715, -5.0128) centre (-63.1715, -5.0128) ccw
  line L30 (-63.1715, -6.0128) -> (-68.0248, -6.0128)
  line L31 (-68.0248, -6.0128) -> (-68.0248, -17.5128)
  circle A18 centre (29.4752, -25.5128) radius 1.25
  circle A19 centre (-29.5248, 25.4872) radius 1.25
  circle A20 centre (-29.5248, -25.5128) radius 1.25
  circle A21 centre (29.4752, 25.4872) radius 1.25
  arc A22 (-24.9698, 22.0872) -> (-21.9698, 25.0872) centre (-24.9698, 25.0872) ccw
  line L32 (-21.9698, 25.0872) -> (-21.9698, 43.4872)
  line L33 (-58.0248, 43.4872) -> (-21.9698, 43.4872)
  arc A23 (-60.0248, 45.4872) -> (-58.0248, 43.4872) centre (-58.0248, 45.4872) ccw
  line L34 (-60.0248, 45.4872) -> (-60.0248, 60.782)
  arc A24 (-58.0248, 62.782) -> (-60.0248, 60.782) centre (-58.0248, 60.782) ccw
  line L35 (-58.0248, 62.782) -> (57.9752, 62.782)
  arc A25 (59.9752, 60.782) -> (57.9752, 62.782) centre (57.9752, 60.782) ccw
  line L36 (59.9752, 60.782) -> (59.9752, 45.4872)
  arc A26 (57.9752, 43.4872) -> (59.9752, 45.4872) centre (57.9752, 45.4872) ccw
  line L37 (22.0457, 43.4872) -> (57.9752, 43.4872)
  line L38 (22.0457, 43.4872) -> (22.0457, 27.601)
  line L39 (22.0457, 27.601) -> (23.1715, 27.601)
  line L40 (23.1715, 27.601) -> (23.1715, 10.2252)
  line L41 (23.1715, 10.2252) -> (22.0457, 10.2252)
  line L42 (22.0457, 10.2252) -> (22.0457, 4.9872)
  line L43 (22.0457, 4.9872) -> (25.0457, 4.9872)
  line L44 (25.0457, 4.9872) -> (25.0457, -5.0128)
  line L45 (25.0457, -5.0128) -> (22.0457, -5.0128)
  line L46 (22.0457, -5.0128) -> (22.0457, -10.2508)
  line L47 (22.0457, -10.2508) -> (23.1715, -10.2508)
  line L48 (23.1715, -10.2508) -> (23.1715, -27.6266)
  line L49 (23.1715, -27.6266) -> (22.0457, -27.6266)
  line L50 (22.0457, -27.6266) -> (22.0457, -29.6128)
  line L51 (22.0457, -29.6128) -> (39.5957, -29.6128)
  line L52 (39.5957, -29.6128) -> (39.5957, -40.6128)
  line L53 (39.5957, -40.6128) -> (22.0457, -40.6128)
  line L54 (22.0457, -40.6128) -> (22.0457, -43.5128)
  line L55 (57.9752, -43.5128) -> (22.0457, -43.5128)
  arc A27 (59.9752, -45.5128) -> (57.9752, -43.5128) centre (57.9752, -45.5128) ccw
  line L56 (59.9752, -45.5128) -> (59.9752, -60.8075)
  arc A28 (57.9752, -62.8075) -> (59.9752, -60.8075) centre (57.9752, -60.8075) ccw
  line L57 (57.9752, -62.8075) -> (-58.0248, -62.8075)
  arc A29 (-60.0248, -60.8075) -> (-58.0248, -62.8075) centre (-58.0248, -60.8075) ccw
  line L58 (-60.0248, -60.8075) -> (-60.0248, -45.5128)
  arc A30 (-58.0248, -43.5128) -> (-60.0248, -45.5128) centre (-58.0248, -45.5128) ccw
  line L59 (-21.9698, -43.5128) -> (-58.0248, -43.5128)
  line L60 (-21.9698, -43.5128) -> (-21.9698, -40.6128)
  line L61 (-21.9698, -40.6128) -> (-36.9698, -40.6128)
  line L62 (-36.9698, -40.6128) -> (-36.9698, -28.1128)
  line L63 (-36.9698, -28.1128) -> (-21.9698, -28.1128)
  line L64 (-21.9698, -28.1128) -> (-21.9698, -18.1128)
  arc A31 (-21.9698, -18.1128) -> (-24.9698, -15.1128) centre (-24.9698, -18.1128) ccw
  line L65 (-24.9698, -15.1128) -> (-32.4715, -15.1128)
  arc A32 (-35.4715, -12.1128) -> (-32.4715, -15.1128) centre (-32.4715, -12.1128) ccw
  line L66 (-35.4715, -12.1128) -> (-35.4715, 19.0872)
  arc A33 (-32.4715, 22.0872) -> (-35.4715, 19.0872) centre (-32.4715, 19.0872) ccw
  line L67 (-32.4715, 22.0872) -> (-24.9698, 22.0872)
  circle A34 centre (66.9752, 49.9872) radius 1.6
  circle A35 centre (66.9752, -50.0128) radius 1.6
  point P0 (0, 0)
  dimension "d9" = 3.2
  dimension "d10" = 3.2
extrude "Выдавливание4" cut sketch "Эскиз4" against normal blind 1 contours A0 | A1 | A34 | A35
sketch "Эскиз5" plane through (0, 0, 2.6) normal (0, 0, -1) x (-1, 0, 0)
  circle A0 centre (66.9752, 49.9872) radius 1.6
  circle A1 centre (66.9752, -50.0128) radius 1.6
  line L0 (78.9752, 52.7508) -> (78.9752, -52.7764)
  line L1 (59.9752, -66.667) -> (59.9752, -28.4266)
  line L2 (59.9752, -28.4266) -> (75.9752, -28.4266)
  line L3 (75.9752, -28.4266) -> (75.9752, 28.401)
  line L4 (75.9752, 28.401) -> (59.9752, 28.401)
  line L5 (59.9752, 28.401) -> (59.9752, 66.6415)
  line L6 (78.9752, 52.7508) -> (78.9752, -52.7764)
  spline S0 degree 4 poles (74.9752, 62.2967) (77.2498, 60.4709) (78.6098, 58.1507) (78.9752, 55.4389) (78.9752, 52.7508) knots 0 0 0 0 0 1 1 1 1 1
  spline S1 degree 4 poles (59.9752, 66.6415) (64.3981, 66.3697) (68.939, 65.6863) (72.4991, 64.2844) (74.9752, 62.2967) knots 0 0 0 0 0 1 1 1 1 1
  spline S2 degree 3 poles (73.0972, 59.9572) (72.8317, 60.1704) (72.2504, 60.5866) (71.3901, 61.0754) (70.4297, 61.5347) (69.5826, 61.8759) (68.4322, 62.2648) (67.4425, 62.5442) (66.1307, 62.8516) (65.027, 63.0635) (63.595, 63.2862) (62.4143, 63.4312) (61.1039, 63.5554) (60.3883, 63.6089) (59.9752, 63.6356) knots 0 0 0 0 0.108911 0.217823 0.272278 0.38119 0.435645 0.544557 0.599012 0.707924 0.762379 0.871291 0.925747 1 1 1 1
  spline S3 degree 3 poles (75.9752, 52.7508) (75.9752, 53.2802) (75.9431, 54.1752) (75.8223, 55.1158) (75.6926, 55.7827) (75.5863, 56.208) (75.4279, 56.7161) (75.2804, 57.1045) (75.0687, 57.5698) (74.8765, 57.9272) (74.6051, 58.3588) (74.3614, 58.6932) (74.0195, 59.1004) (73.638, 59.4977) (73.2859, 59.8058) (73.0972, 59.9572) knots 0 0 0 0 0.166667 0.291667 0.333333 0.416667 0.458333 0.541667 0.583333 0.666667 0.708333 0.791667 0.833333 0.916667 1 1 1 1
  line L7 (75.9752, -52.7764) -> (75.9752, 52.7508)
  spline S4 degree 3 poles (73.0972, -59.9828) (73.2859, -59.8313) (73.638, -59.5233) (74.0195, -59.126) (74.3614, -58.7188) (74.6051, -58.3843) (74.8765, -57.9527) (75.0687, -57.5953) (75.2804, -57.1301) (75.4279, -56.7417) (75.5863, -56.2336) (75.6926, -55.8083) (75.8007, -55.2525) (75.8676, -54.7887) (75.9281, -54.186) (75.9662, -53.5615) (75.9752, -53.0411) (75.9752, -52.7764) knots 0 0 0 0 0.083333 0.166667 0.208333 0.291667 0.333333 0.416667 0.458333 0.541667 0.583333 0.666667 0.708333 0.791667 0.833333 0.916667 1 1 1 1
  spline S5 degree 3 poles (59.9752, -63.6611) (60.3883, -63.6345) (61.1039, -63.581) (62.4143, -63.4568) (63.595, -63.3118) (65.027, -63.0891) (66.1307, -62.8772) (67.4425, -62.5698) (68.4322, -62.2903) (69.5826, -61.9014) (70.4297, -61.5602) (71.3901, -61.101) (72.2504, -60.6122) (72.8317, -60.196) (73.0972, -59.9828) knots 0 0 0 0 0.074253 0.128709 0.237621 0.292076 0.400988 0.455443 0.564355 0.61881 0.727722 0.782177 0.891089 1 1 1 1
  spline S6 degree 4 poles (74.9752, -62.3223) (72.4991, -64.31) (68.939, -65.7118) (64.3981, -66.3953) (59.9752, -66.667) knots 0 0 0 0 0 1 1 1 1 1
  spline S7 degree 4 poles (78.9752, -52.7764) (78.9752, -55.4644) (78.6098, -58.1763) (77.2498, -60.4964) (74.9752, -62.3223) knots 0 0 0 0 0 1 1 1 1 1
  line L8 (71.9752, 52.7508) -> (71.9752, -52.7764)
  spline S8 degree 5 poles (59.7179, 59.6438) (61.136, 59.5524) (62.551, 59.417) (63.9606, 59.2241) (66.2021, 58.8052) (68.3651, 58.0878) (69.1524, 57.7616) (69.9266, 57.3714) (70.5933, 56.8379) knots 0 0 0 0 0 0 0.624879 0.624879 0.624879 1 1 1 1 1 1
  spline S9 degree 5 poles (70.5933, 56.8379) (70.8602, 56.6226) (71.1092, 56.3872) (71.3311, 56.1151) (71.7518, 55.3124) (71.9043, 54.4128) (71.9552, 53.862) (71.9752, 53.3056) (71.9752, 52.7508) knots 0 0 0 0 0 0 0.381774 0.381774 0.381774 1 1 1 1 1 1
  spline S10 degree 5 poles (71.9752, -52.7764) (71.9754, -53.3312) (71.9552, -53.8876) (71.9042, -54.4384) (71.7518, -55.338) (71.3311, -56.1407) (71.1092, -56.4128) (70.8602, -56.6482) (70.5933, -56.8635) knots 0 0 0 0 0 0 0.618226 0.618226 0.618226 1 1 1 1 1 1
  spline S11 degree 5 poles (70.5933, -56.8635) (69.9266, -57.397) (69.1524, -57.7871) (68.3651, -58.1134) (66.2021, -58.8308) (63.9606, -59.2497) (62.551, -59.4425) (61.136, -59.578) (59.7179, -59.6694) knots 0 0 0 0 0 0 0.375121 0.375121 0.375121 1 1 1 1 1 1
  point P0 (0, 0)
  point P1 (71.9752, -28.4266)
  point P2 (59.9752, -59.6522)
  point P3 (59.9752, 59.6267)
  point P4 (71.9752, 28.401)
  dimension "d20" = 4
extrude "Выдавливание5" add sketch "Эскиз5" along normal blind 1.9 contours S8 S9 L8 L4 L5 | L1 L2 L8 S10 S11
sketch "Эскиз7" plane through (0, 0, 3) normal (0, 0, 1) x (1, 0, 0)
  circle A0 centre (-66.9752, 49.9872) radius 1.6 projected
  circle A1 centre (-66.9752, -50.0128) radius 1.6 projected
  line L0 (-78.9752, 52.7508) -> (-78.9752, -52.7764) projected
  line L1 (-59.9752, -66.667) -> (-59.9752, -28.4266) projected
  line L2 (-59.9752, -28.4266) -> (-75.9752, -28.4266) projected
  line L3 (-75.9752, -28.4266) -> (-75.9752, 28.401) projected
  line L4 (-75.9752, 28.401) -> (-59.9752, 28.401) projected
  line L5 (-59.9752, 28.401) -> (-59.9752, 66.6415) projected
  line L6 (-71.2752, 31.701) -> (-66.2752, 31.701)
  line L7 (-66.2752, 31.701) -> (-66.2752, 41.701)
  line L8 (-66.2752, 41.701) -> (-71.2752, 41.701)
  line L9 (-71.2752, 41.701) -> (-71.2752, 31.701)
  line L10 (-71.2752, 31.701) -> (-66.2752, 41.701) construction
  line L11 (-66.2752, 31.701) -> (-71.2752, 41.701) construction
  line L12 (-65.9752, 42.001) -> (-65.9752, 31.401)
  line L13 (-65.9752, 31.401) -> (-71.5752, 31.401)
  line L14 (-71.5752, 31.401) -> (-71.5752, 42.001)
  line L15 (-71.5752, 42.001) -> (-65.9752, 42.001)
  point P0 (0, 0)
  point P1 (-68.7752, 36.701)
  dimension "d38" = 5
  dimension "d39" = 10
  dimension "d40" = 0.3
  dimension "d41" = 3
  dimension "d42" = 6
extrude "Выдавливание7" cut sketch "Эскиз7" against normal blind 1.8 contours L9 L8 L7 L6 | L12 L13 L14 L15
sketch "Эскиз8" plane through (0, 0, 3) normal (0, 0, 1) x (1, 0, 0)
  line L0 (-65.9752, 31.401) -> (-71.5752, 31.401) projected
  line L1 (-71.5752, 31.401) -> (-71.5752, 42.001) projected
  line L2 (-71.5752, 42.001) -> (-65.9752, 42.001) projected
  line L3 (-65.9752, 42.001) -> (-65.9752, 31.401) projected
  circle A0 centre (-66.9752, 49.9872) radius 1.6 projected
  circle A1 centre (-66.9752, -50.0128) radius 1.6 projected
  line L4 (-78.9752, 52.7508) -> (-78.9752, -52.7764) projected
  line L5 (-59.9752, -66.667) -> (-59.9752, -28.4266) projected
  line L6 (-59.9752, -28.4266) -> (-75.9752, -28.4266) projected
  line L7 (-75.9752, -28.4266) -> (-75.9752, 28.401) projected
  line L8 (-75.9752, 28.401) -> (-59.9752, 28.401) projected
  line L9 (-59.9752, 28.401) -> (-59.9752, 66.6415) projected
  line L10 (-61.6823, 45.001) -> (-72.9672, 45.001) projected
  line L11 (-59.9752, 28.401) -> (-71.9752, 28.401) projected
  line L12 (-59.9752, 28.401) -> (-62.9752, 28.401)
  line L13 (-62.9752, 28.401) -> (-62.9752, 45.001)
  line L14 (-62.9752, 45.001) -> (-59.9752, 45.001)
  line L15 (-59.9752, 45.001) -> (-59.9752, 28.401)
  line L16 (-59.9752, 28.401) -> (-59.9752, 66.6415) projected
  line L17 (-62.9752, 45.001) -> (-59.9752, 45.001)
  line L18 (-59.9752, 45.001) -> (-59.9752, 45.251)
  line L19 (-59.9752, 45.251) -> (-62.9752, 45.251)
  line L20 (-62.9752, 45.251) -> (-62.9752, 45.001)
  point P0 (0, 0)
  dimension "d45" = 3
  dimension "d48" = 0.25
extrude "Выдавливание8" cut sketch "Эскиз8" against normal blind 3 contours L13 L10 L14 L9 L8 | L20 L19 L9 L14 L10
chamfer "Фаска3" distance 1 angle 45 2 edges at (-61.4752, 45.251, 3) (-62.9752, 36.826, 3)
mirror "Зеркальное отражение1" about plane through (0, 0, 0) normal (0, 1, 0) of "Выдавливание7", "Выдавливание8", "Фаска3"
properties part number "back_diffuser"
